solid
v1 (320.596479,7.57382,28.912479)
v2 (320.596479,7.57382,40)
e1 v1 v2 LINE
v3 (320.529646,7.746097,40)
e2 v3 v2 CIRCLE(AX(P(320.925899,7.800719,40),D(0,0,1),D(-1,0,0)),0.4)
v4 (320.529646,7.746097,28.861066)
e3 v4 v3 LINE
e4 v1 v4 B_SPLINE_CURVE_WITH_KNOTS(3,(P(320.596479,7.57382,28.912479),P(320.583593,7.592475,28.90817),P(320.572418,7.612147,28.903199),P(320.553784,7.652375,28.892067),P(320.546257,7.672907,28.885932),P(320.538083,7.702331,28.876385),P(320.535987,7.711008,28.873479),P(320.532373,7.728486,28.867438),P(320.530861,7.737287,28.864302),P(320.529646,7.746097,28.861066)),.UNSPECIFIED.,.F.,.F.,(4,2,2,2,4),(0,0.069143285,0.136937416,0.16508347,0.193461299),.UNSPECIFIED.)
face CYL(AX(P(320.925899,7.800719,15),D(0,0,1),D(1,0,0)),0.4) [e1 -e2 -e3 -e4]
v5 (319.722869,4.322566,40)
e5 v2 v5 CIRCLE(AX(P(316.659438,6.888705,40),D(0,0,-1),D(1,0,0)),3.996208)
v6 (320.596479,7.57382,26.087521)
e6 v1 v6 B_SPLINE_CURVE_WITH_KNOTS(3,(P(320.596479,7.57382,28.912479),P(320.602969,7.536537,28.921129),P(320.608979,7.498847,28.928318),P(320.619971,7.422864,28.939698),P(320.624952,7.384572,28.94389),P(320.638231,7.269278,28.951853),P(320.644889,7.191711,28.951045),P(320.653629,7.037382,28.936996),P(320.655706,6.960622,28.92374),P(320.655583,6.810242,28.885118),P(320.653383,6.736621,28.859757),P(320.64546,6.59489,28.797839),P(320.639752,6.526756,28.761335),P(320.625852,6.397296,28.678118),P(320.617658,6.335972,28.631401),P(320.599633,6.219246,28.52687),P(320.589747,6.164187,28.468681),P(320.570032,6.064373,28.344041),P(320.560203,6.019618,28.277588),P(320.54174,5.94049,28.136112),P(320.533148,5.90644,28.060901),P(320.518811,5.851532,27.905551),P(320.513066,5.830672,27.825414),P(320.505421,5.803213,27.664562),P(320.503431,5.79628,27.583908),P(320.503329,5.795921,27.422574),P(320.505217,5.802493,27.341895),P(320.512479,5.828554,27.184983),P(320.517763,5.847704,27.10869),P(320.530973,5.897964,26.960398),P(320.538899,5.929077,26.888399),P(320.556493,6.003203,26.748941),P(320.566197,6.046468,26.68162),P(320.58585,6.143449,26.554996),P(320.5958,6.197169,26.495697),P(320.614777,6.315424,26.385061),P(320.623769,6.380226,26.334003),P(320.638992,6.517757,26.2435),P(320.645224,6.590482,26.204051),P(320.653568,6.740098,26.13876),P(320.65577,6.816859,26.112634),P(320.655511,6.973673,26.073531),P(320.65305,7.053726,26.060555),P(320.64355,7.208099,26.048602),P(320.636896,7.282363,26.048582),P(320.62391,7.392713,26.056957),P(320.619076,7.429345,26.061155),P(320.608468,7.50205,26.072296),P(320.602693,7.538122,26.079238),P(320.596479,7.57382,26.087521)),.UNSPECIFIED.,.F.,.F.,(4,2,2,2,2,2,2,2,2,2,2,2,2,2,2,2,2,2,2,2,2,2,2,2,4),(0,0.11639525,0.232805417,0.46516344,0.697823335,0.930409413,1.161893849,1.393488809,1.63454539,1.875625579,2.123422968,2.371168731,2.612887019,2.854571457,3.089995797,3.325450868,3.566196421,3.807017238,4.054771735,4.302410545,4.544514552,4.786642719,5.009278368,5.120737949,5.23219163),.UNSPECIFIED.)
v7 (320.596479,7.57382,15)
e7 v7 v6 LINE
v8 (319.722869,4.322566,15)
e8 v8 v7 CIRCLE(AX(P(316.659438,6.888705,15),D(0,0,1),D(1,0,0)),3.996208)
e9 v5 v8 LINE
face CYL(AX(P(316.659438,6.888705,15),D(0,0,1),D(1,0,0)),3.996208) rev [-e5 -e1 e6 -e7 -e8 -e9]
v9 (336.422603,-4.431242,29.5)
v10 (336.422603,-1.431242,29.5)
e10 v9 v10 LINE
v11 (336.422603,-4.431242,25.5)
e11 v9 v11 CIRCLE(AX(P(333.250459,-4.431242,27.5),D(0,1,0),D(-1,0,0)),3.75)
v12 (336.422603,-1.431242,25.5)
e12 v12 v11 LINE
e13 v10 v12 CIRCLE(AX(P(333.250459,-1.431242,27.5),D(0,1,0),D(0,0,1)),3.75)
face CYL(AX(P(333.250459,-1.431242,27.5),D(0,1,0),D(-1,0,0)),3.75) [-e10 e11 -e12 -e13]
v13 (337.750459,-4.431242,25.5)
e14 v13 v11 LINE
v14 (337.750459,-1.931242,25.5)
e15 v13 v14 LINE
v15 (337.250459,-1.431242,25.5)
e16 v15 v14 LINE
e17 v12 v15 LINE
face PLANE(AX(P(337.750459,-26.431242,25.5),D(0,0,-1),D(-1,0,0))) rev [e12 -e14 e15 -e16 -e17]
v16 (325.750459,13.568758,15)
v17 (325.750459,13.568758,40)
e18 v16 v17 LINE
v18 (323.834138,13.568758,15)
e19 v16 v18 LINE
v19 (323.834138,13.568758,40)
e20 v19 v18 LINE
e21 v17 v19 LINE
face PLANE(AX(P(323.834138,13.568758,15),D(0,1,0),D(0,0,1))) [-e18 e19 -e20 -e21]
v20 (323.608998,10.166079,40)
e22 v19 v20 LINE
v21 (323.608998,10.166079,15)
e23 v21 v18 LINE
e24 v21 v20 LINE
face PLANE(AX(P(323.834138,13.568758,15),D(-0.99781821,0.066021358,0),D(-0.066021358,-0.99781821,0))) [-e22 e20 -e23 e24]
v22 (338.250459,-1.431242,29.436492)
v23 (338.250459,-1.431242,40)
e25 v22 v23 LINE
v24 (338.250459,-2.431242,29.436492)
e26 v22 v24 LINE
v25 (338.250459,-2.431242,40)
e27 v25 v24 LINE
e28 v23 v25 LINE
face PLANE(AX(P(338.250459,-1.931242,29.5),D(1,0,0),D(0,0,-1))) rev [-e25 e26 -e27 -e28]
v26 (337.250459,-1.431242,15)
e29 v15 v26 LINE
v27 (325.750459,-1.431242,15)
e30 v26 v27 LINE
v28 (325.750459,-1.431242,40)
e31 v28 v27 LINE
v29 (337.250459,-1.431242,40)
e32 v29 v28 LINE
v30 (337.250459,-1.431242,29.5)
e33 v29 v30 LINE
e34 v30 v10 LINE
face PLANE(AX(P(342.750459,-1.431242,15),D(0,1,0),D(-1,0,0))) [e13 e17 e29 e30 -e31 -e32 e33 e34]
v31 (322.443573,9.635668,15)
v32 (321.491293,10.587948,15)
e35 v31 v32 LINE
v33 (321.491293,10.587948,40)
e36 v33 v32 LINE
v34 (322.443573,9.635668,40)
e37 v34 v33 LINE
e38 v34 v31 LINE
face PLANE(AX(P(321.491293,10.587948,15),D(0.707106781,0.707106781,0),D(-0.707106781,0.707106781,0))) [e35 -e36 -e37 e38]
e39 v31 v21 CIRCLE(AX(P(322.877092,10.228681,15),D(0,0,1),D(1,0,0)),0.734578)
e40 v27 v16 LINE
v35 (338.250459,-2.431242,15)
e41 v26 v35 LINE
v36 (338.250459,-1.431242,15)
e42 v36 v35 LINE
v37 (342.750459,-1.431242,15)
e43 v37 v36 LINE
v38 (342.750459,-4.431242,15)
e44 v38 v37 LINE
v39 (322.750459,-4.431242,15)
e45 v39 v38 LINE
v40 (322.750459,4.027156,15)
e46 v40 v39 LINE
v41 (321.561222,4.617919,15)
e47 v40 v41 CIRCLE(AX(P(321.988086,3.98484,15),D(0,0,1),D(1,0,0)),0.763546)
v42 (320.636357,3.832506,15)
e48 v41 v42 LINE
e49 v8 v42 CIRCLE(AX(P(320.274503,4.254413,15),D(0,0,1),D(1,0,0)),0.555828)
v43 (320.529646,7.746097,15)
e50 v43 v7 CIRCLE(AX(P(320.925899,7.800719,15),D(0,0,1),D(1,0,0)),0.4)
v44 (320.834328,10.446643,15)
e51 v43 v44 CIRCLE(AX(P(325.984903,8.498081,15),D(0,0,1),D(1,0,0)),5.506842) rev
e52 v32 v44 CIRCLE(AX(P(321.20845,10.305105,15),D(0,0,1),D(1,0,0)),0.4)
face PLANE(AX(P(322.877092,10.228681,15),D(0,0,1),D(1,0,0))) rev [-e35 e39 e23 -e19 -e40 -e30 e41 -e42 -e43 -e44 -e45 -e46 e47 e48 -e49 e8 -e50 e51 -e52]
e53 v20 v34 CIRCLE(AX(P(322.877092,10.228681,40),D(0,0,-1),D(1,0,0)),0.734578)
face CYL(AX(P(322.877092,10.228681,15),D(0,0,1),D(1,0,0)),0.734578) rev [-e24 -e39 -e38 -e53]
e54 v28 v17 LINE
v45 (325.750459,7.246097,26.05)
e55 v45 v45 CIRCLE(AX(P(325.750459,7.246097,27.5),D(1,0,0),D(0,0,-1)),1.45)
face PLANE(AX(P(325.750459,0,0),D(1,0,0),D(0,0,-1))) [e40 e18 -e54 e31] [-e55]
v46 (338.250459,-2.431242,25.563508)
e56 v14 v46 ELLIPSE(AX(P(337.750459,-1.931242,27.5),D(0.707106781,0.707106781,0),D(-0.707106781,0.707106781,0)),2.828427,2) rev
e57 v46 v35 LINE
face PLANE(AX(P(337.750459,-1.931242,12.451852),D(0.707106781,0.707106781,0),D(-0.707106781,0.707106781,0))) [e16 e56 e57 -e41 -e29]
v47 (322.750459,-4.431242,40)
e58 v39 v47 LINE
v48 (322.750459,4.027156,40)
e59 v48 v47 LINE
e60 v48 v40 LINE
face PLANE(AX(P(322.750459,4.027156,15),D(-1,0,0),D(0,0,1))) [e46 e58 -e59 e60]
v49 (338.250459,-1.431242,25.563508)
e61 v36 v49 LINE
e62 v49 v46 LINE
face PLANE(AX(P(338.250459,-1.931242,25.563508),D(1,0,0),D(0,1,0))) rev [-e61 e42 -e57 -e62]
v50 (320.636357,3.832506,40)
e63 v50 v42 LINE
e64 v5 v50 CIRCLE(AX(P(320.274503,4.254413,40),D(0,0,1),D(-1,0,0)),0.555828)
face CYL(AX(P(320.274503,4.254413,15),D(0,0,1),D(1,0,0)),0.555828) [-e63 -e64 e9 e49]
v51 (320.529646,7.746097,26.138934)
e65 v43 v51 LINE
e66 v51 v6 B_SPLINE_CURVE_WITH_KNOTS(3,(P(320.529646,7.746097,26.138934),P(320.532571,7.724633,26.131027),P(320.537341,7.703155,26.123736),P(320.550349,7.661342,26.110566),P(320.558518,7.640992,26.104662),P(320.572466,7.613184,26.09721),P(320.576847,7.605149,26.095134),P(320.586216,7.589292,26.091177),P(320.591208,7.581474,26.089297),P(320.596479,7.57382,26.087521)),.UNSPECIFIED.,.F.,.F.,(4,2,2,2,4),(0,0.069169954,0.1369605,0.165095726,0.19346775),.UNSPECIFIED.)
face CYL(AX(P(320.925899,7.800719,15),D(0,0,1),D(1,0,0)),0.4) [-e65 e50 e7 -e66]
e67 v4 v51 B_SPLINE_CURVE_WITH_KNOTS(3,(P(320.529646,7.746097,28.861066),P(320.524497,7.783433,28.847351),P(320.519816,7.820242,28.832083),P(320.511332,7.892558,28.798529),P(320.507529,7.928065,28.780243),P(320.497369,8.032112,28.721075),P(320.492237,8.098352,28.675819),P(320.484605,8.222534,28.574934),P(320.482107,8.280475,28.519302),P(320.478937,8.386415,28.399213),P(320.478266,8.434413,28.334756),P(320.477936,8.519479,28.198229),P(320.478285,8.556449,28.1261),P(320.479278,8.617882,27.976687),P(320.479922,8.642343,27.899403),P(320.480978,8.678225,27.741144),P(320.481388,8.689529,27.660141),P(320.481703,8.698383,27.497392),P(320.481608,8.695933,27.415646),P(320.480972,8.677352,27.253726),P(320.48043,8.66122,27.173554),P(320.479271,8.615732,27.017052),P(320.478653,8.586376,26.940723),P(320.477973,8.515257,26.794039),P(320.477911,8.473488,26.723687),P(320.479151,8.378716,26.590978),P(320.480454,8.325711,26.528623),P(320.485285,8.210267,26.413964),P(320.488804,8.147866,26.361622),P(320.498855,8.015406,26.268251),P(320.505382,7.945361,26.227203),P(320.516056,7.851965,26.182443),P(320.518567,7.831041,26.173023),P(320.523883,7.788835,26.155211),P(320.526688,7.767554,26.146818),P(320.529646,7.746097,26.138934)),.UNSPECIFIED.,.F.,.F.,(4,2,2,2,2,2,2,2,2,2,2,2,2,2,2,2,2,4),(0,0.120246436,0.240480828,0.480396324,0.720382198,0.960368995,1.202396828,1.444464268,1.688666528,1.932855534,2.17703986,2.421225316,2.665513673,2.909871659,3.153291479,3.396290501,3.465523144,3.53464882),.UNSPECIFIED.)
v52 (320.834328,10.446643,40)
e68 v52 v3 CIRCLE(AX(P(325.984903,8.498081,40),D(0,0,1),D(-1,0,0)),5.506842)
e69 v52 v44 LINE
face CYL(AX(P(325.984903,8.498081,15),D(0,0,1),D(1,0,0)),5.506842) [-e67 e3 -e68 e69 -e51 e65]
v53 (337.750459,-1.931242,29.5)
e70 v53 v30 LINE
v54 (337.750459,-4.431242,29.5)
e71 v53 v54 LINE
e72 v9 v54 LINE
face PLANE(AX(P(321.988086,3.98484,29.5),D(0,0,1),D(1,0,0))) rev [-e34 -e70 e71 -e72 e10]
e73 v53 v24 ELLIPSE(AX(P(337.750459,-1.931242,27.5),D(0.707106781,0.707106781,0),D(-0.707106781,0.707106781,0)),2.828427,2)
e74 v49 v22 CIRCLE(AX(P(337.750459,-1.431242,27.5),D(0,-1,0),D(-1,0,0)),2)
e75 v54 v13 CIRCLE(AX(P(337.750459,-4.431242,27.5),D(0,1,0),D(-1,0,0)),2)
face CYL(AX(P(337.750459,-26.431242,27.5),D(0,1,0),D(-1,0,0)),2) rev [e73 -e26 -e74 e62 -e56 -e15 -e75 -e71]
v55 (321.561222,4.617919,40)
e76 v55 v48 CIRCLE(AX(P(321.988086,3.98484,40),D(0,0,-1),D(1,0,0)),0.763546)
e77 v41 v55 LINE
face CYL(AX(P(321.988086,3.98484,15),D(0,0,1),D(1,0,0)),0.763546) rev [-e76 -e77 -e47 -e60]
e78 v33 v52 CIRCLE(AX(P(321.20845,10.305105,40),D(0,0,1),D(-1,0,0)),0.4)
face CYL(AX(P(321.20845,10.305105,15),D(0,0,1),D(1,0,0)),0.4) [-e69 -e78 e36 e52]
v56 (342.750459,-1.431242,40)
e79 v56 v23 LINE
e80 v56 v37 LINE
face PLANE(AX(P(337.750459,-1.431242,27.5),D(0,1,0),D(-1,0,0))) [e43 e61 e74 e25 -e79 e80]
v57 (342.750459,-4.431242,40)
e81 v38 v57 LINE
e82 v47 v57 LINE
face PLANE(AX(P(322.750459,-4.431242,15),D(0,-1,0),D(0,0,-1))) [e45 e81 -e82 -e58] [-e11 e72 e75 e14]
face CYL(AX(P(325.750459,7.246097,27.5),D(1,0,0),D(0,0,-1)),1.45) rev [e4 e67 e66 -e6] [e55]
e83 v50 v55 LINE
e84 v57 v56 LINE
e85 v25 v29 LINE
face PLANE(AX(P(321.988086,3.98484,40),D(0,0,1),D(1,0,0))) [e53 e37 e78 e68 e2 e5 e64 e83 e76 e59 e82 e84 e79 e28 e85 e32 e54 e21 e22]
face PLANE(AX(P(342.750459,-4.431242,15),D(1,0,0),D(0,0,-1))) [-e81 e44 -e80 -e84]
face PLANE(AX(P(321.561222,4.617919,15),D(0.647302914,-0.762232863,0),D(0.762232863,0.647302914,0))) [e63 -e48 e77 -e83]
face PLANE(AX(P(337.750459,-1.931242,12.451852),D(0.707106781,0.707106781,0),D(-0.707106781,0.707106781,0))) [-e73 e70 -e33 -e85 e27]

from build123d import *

# Parameters (mm, degrees)
CUT_EXTRUDE1_START        = 15
CUT_EXTRUDE1_DEPTH        = 10.5
CUT_EXTRUDE1_START_2      = 25.5
CUT_EXTRUDE1_2_DEPTH      = 4
CUT_EXTRUDE1_START_3      = -5
CUT_EXTRUDE1_3_DEPTH      = 3.568757805
BOSS_EXTRUDE1_DEPTH       = 0.5
BOSS_EXTRUDE2_DEPTH       = 0.5
SKETCH4_W                 = 14.5
SKETCH4_H                 = 15
CUT_EXTRUDE2_DEPTH        = 10.672144385
BOSS_EXTRUDE3_DEPTH       = 10.5
F_3_CLEARANCE_HOLE1_D     = 2.9
F_3_CLEARANCE_HOLE1_DEPTH = 6.031783808


with BuildPart() as part:
    # Cut-Extrude1: read off the stored shape, not the designer's step
    # Cut-Extrude1 outline → Cut-Extrude1 (new body)
    with BuildSketch(Plane.XY.offset(CUT_EXTRUDE1_START)):
        with BuildLine():
            Line((337.250458866, -1.431242195), (336.422603251, -1.431242195))
            Line((336.422603251, -1.431242195), (336.422603251, 13.568757805))
            Line((336.422603251, 13.568757805), (323.834138276, 13.568757805))
            Line((323.834138276, 13.568757805), (323.608997572, 10.166078708))
            ThreePointArc((323.608997572, 10.166078708), (323.181382472, 9.560091757), (322.443572772, 9.635667582))
            Line((322.443572772, 9.635667582), (321.491292518, 10.587947835))
            ThreePointArc((321.491292518, 10.587947835), (321.1243382, 10.696161689), (320.834327975, 10.446642593))
            ThreePointArc((320.834327975, 10.446642593), (320.5127775, 9.115460329), (320.529645575, 7.746096829))
            ThreePointArc((320.529645575, 7.746096829), (320.552977781, 7.656046386), (320.596479116, 7.57382043))
            ThreePointArc((320.596479116, 7.57382043), (320.51875348, 5.851708999), (319.722869168, 4.322566357))
            ThreePointArc((319.722869168, 4.322566357), (320.011740784, 3.764617073), (320.636356902, 3.832506086))
            Line((320.636356902, 3.832506086), (321.56122175, 4.617919231))
            ThreePointArc((321.56122175, 4.617919231), (322.32777998, 4.668660807), (322.750458866, 4.027155713))
            Line((322.750458866, 4.027155713), (322.750458866, -4.431242195))
            Line((322.750458866, -4.431242195), (342.750458866, -4.431242195))
            Line((342.750458866, -4.431242195), (342.750458866, -2.431242195))
            Line((342.750458866, -2.431242195), (338.250458866, -2.431242195))
            Line((338.250458866, -2.431242195), (337.250458866, -1.431242195))
        make_face()
    extrude(amount=CUT_EXTRUDE1_DEPTH)

    # Cut-Extrude1 2 outline → Cut-Extrude1 2 (add)
    with BuildSketch(Plane.XY.offset(CUT_EXTRUDE1_START_2)):
        with BuildLine():
            Line((337.250458866, -1.431242195), (336.422603251, -1.431242195))
            Line((336.422603251, -1.431242195), (336.422603251, 13.568757805))
            Line((336.422603251, 13.568757805), (323.834138276, 13.568757805))
            Line((323.834138276, 13.568757805), (323.608997572, 10.166078708))
            ThreePointArc((323.608997572, 10.166078708), (323.181382472, 9.560091757), (322.443572772, 9.635667582))
            Line((322.443572772, 9.635667582), (321.491292518, 10.587947835))
            ThreePointArc((321.491292518, 10.587947835), (321.1243382, 10.696161689), (320.834327975, 10.446642593))
            ThreePointArc((320.834327975, 10.446642593), (320.5127775, 9.115460329), (320.529645575, 7.746096829))
            ThreePointArc((320.529645575, 7.746096829), (320.552977781, 7.656046386), (320.596479116, 7.57382043))
            ThreePointArc((320.596479116, 7.57382043), (320.51875348, 5.851708999), (319.722869168, 4.322566357))
            ThreePointArc((319.722869168, 4.322566357), (320.011740784, 3.764617073), (320.636356902, 3.832506086))
            Line((320.636356902, 3.832506086), (321.56122175, 4.617919231))
            ThreePointArc((321.56122175, 4.617919231), (322.32777998, 4.668660807), (322.750458866, 4.027155713))
            Line((322.750458866, 4.027155713), (322.750458866, -4.431242195))
            Line((322.750458866, -4.431242195), (342.750458866, -4.431242195))
            Line((342.750458866, -4.431242195), (342.750458866, -2.431242195))
            Line((342.750458866, -2.431242195), (338.250458866, -2.431242195))
            Line((338.250458866, -2.431242195), (337.250458866, -1.431242195))
        make_face()
    extrude(amount=CUT_EXTRUDE1_2_DEPTH)

    # Cut-Extrude1 3 outline → Cut-Extrude1 3 (cut)
    with BuildSketch(Plane(origin=(0, 0, 0), x_dir=(1, 0, 0), z_dir=(0, 1, 0)).offset(CUT_EXTRUDE1_START_3)):
        with BuildLine():
            ThreePointArc((336.422603251, -25.5), (337.000458866, -27.5), (336.422603251, -29.5))
            Line((336.422603251, -29.5), (337.750458866, -29.5))
            ThreePointArc((337.750458866, -29.5), (339.750458866, -27.5), (337.750458866, -25.5))
            Line((337.750458866, -25.5), (336.422603251, -25.5))
        make_face()
    extrude(amount=CUT_EXTRUDE1_3_DEPTH, mode=Mode.SUBTRACT)

    # Sketch2 → Boss-Extrude1 (add)
    with BuildSketch(Plane(origin=(0, -2.431242195, 0), x_dir=(-1, 0, 0), z_dir=(0, 1, 0))):
        with BuildLine():
            Line((-338.250458866, 29.5), (-338.250458866, 29.436491673))
            ThreePointArc((-338.250458866, 29.436491673), (-339.750458866, 27.5), (-338.250458866, 25.563508327))
            Line((-338.250458866, 25.563508327), (-338.250458866, 15))
            Line((-338.250458866, 15), (-342.750458866, 15))
            Line((-342.750458866, 15), (-342.750458866, 29.5))
            Line((-342.750458866, 29.5), (-338.250458866, 29.5))
        make_face()
    extrude(amount=BOSS_EXTRUDE1_DEPTH)

    # Sketch3 → Boss-Extrude2 (add)
    with BuildSketch(Plane(origin=(0, -1.931242195, 0), x_dir=(-1, 0, 0), z_dir=(0, 1, 0))):
        with BuildLine():
            Line((-338.250458866, 29.5), (-338.250458866, 29.436491673))
            ThreePointArc((-338.250458866, 29.436491673), (-339.750458866, 27.5), (-338.250458866, 25.563508327))
            Line((-338.250458866, 25.563508327), (-338.250458866, 15))
            Line((-338.250458866, 15), (-342.750458866, 15))
            Line((-342.750458866, 15), (-342.750458866, 29.5))
            Line((-342.750458866, 29.5), (-338.250458866, 29.5))
        make_face()
    extrude(amount=BOSS_EXTRUDE2_DEPTH)

    # Sketch4 → Cut-Extrude2 (cut)
    with BuildSketch(Plane(origin=(336.422603251, 0, 0), x_dir=(0, 0, -1), z_dir=(1, 0, 0))):
        with Locations((-22.25, 6.068757805)):
            Rectangle(SKETCH4_W, SKETCH4_H)
    extrude(amount=-CUT_EXTRUDE2_DEPTH, mode=Mode.SUBTRACT)

    # Sketch5 → Boss-Extrude3 (add)
    with BuildSketch(Plane.XY.offset(29.5)):
        with BuildLine():
            Line((322.750458866, -4.431242195), (322.750458866, 4.027155713))
            ThreePointArc((322.750458866, 4.027155713), (322.32777998, 4.668660807), (321.56122175, 4.617919231))
            Line((321.56122175, 4.617919231), (320.636356902, 3.832506086))
            ThreePointArc((320.636356902, 3.832506086), (320.011740784, 3.764617073), (319.722869168, 4.322566357))
            ThreePointArc((319.722869168, 4.322566357), (320.51875348, 5.851708999), (320.596479116, 7.57382043))
            ThreePointArc((320.596479116, 7.57382043), (320.552977781, 7.656046387), (320.529645575, 7.746096829))
            ThreePointArc((320.529645575, 7.746096829), (320.5127775, 9.11546033), (320.834327975, 10.446642593))
            ThreePointArc((320.834327975, 10.446642593), (321.1243382, 10.696161689), (321.491292518, 10.587947835))
            Line((321.491292518, 10.587947835), (322.443572772, 9.635667582))
            ThreePointArc((322.443572772, 9.635667582), (323.181382472, 9.560091757), (323.608997572, 10.166078708))
            Line((323.608997572, 10.166078708), (323.834138276, 13.568757805))
            Line((323.834138276, 13.568757805), (325.750458866, 13.568757805))
            Line((325.750458866, 13.568757805), (325.750458866, -1.431242195))
            Line((325.750458866, -1.431242195), (337.250458866, -1.431242195))
            Line((337.250458866, -1.431242195), (338.250458866, -2.431242195))
            Line((338.250458866, -2.431242195), (338.250458866, -1.431242195))
            Line((338.250458866, -1.431242195), (342.750458866, -1.431242195))
            Line((342.750458866, -1.431242195), (342.750458866, -4.431242195))
            Line((342.750458866, -4.431242195), (322.750458866, -4.431242195))
        make_face()
    extrude(amount=BOSS_EXTRUDE3_DEPTH)

    # #3 Clearance Hole1
    with Locations(Plane(origin=(325.750458866, 0, 0), x_dir=(0, 0, -1), z_dir=(1, 0, 0))):
        with Locations((-27.5, 7.246096829)):
            Hole(F_3_CLEARANCE_HOLE1_D / 2, depth=F_3_CLEARANCE_HOLE1_DEPTH)


solid = part.part
